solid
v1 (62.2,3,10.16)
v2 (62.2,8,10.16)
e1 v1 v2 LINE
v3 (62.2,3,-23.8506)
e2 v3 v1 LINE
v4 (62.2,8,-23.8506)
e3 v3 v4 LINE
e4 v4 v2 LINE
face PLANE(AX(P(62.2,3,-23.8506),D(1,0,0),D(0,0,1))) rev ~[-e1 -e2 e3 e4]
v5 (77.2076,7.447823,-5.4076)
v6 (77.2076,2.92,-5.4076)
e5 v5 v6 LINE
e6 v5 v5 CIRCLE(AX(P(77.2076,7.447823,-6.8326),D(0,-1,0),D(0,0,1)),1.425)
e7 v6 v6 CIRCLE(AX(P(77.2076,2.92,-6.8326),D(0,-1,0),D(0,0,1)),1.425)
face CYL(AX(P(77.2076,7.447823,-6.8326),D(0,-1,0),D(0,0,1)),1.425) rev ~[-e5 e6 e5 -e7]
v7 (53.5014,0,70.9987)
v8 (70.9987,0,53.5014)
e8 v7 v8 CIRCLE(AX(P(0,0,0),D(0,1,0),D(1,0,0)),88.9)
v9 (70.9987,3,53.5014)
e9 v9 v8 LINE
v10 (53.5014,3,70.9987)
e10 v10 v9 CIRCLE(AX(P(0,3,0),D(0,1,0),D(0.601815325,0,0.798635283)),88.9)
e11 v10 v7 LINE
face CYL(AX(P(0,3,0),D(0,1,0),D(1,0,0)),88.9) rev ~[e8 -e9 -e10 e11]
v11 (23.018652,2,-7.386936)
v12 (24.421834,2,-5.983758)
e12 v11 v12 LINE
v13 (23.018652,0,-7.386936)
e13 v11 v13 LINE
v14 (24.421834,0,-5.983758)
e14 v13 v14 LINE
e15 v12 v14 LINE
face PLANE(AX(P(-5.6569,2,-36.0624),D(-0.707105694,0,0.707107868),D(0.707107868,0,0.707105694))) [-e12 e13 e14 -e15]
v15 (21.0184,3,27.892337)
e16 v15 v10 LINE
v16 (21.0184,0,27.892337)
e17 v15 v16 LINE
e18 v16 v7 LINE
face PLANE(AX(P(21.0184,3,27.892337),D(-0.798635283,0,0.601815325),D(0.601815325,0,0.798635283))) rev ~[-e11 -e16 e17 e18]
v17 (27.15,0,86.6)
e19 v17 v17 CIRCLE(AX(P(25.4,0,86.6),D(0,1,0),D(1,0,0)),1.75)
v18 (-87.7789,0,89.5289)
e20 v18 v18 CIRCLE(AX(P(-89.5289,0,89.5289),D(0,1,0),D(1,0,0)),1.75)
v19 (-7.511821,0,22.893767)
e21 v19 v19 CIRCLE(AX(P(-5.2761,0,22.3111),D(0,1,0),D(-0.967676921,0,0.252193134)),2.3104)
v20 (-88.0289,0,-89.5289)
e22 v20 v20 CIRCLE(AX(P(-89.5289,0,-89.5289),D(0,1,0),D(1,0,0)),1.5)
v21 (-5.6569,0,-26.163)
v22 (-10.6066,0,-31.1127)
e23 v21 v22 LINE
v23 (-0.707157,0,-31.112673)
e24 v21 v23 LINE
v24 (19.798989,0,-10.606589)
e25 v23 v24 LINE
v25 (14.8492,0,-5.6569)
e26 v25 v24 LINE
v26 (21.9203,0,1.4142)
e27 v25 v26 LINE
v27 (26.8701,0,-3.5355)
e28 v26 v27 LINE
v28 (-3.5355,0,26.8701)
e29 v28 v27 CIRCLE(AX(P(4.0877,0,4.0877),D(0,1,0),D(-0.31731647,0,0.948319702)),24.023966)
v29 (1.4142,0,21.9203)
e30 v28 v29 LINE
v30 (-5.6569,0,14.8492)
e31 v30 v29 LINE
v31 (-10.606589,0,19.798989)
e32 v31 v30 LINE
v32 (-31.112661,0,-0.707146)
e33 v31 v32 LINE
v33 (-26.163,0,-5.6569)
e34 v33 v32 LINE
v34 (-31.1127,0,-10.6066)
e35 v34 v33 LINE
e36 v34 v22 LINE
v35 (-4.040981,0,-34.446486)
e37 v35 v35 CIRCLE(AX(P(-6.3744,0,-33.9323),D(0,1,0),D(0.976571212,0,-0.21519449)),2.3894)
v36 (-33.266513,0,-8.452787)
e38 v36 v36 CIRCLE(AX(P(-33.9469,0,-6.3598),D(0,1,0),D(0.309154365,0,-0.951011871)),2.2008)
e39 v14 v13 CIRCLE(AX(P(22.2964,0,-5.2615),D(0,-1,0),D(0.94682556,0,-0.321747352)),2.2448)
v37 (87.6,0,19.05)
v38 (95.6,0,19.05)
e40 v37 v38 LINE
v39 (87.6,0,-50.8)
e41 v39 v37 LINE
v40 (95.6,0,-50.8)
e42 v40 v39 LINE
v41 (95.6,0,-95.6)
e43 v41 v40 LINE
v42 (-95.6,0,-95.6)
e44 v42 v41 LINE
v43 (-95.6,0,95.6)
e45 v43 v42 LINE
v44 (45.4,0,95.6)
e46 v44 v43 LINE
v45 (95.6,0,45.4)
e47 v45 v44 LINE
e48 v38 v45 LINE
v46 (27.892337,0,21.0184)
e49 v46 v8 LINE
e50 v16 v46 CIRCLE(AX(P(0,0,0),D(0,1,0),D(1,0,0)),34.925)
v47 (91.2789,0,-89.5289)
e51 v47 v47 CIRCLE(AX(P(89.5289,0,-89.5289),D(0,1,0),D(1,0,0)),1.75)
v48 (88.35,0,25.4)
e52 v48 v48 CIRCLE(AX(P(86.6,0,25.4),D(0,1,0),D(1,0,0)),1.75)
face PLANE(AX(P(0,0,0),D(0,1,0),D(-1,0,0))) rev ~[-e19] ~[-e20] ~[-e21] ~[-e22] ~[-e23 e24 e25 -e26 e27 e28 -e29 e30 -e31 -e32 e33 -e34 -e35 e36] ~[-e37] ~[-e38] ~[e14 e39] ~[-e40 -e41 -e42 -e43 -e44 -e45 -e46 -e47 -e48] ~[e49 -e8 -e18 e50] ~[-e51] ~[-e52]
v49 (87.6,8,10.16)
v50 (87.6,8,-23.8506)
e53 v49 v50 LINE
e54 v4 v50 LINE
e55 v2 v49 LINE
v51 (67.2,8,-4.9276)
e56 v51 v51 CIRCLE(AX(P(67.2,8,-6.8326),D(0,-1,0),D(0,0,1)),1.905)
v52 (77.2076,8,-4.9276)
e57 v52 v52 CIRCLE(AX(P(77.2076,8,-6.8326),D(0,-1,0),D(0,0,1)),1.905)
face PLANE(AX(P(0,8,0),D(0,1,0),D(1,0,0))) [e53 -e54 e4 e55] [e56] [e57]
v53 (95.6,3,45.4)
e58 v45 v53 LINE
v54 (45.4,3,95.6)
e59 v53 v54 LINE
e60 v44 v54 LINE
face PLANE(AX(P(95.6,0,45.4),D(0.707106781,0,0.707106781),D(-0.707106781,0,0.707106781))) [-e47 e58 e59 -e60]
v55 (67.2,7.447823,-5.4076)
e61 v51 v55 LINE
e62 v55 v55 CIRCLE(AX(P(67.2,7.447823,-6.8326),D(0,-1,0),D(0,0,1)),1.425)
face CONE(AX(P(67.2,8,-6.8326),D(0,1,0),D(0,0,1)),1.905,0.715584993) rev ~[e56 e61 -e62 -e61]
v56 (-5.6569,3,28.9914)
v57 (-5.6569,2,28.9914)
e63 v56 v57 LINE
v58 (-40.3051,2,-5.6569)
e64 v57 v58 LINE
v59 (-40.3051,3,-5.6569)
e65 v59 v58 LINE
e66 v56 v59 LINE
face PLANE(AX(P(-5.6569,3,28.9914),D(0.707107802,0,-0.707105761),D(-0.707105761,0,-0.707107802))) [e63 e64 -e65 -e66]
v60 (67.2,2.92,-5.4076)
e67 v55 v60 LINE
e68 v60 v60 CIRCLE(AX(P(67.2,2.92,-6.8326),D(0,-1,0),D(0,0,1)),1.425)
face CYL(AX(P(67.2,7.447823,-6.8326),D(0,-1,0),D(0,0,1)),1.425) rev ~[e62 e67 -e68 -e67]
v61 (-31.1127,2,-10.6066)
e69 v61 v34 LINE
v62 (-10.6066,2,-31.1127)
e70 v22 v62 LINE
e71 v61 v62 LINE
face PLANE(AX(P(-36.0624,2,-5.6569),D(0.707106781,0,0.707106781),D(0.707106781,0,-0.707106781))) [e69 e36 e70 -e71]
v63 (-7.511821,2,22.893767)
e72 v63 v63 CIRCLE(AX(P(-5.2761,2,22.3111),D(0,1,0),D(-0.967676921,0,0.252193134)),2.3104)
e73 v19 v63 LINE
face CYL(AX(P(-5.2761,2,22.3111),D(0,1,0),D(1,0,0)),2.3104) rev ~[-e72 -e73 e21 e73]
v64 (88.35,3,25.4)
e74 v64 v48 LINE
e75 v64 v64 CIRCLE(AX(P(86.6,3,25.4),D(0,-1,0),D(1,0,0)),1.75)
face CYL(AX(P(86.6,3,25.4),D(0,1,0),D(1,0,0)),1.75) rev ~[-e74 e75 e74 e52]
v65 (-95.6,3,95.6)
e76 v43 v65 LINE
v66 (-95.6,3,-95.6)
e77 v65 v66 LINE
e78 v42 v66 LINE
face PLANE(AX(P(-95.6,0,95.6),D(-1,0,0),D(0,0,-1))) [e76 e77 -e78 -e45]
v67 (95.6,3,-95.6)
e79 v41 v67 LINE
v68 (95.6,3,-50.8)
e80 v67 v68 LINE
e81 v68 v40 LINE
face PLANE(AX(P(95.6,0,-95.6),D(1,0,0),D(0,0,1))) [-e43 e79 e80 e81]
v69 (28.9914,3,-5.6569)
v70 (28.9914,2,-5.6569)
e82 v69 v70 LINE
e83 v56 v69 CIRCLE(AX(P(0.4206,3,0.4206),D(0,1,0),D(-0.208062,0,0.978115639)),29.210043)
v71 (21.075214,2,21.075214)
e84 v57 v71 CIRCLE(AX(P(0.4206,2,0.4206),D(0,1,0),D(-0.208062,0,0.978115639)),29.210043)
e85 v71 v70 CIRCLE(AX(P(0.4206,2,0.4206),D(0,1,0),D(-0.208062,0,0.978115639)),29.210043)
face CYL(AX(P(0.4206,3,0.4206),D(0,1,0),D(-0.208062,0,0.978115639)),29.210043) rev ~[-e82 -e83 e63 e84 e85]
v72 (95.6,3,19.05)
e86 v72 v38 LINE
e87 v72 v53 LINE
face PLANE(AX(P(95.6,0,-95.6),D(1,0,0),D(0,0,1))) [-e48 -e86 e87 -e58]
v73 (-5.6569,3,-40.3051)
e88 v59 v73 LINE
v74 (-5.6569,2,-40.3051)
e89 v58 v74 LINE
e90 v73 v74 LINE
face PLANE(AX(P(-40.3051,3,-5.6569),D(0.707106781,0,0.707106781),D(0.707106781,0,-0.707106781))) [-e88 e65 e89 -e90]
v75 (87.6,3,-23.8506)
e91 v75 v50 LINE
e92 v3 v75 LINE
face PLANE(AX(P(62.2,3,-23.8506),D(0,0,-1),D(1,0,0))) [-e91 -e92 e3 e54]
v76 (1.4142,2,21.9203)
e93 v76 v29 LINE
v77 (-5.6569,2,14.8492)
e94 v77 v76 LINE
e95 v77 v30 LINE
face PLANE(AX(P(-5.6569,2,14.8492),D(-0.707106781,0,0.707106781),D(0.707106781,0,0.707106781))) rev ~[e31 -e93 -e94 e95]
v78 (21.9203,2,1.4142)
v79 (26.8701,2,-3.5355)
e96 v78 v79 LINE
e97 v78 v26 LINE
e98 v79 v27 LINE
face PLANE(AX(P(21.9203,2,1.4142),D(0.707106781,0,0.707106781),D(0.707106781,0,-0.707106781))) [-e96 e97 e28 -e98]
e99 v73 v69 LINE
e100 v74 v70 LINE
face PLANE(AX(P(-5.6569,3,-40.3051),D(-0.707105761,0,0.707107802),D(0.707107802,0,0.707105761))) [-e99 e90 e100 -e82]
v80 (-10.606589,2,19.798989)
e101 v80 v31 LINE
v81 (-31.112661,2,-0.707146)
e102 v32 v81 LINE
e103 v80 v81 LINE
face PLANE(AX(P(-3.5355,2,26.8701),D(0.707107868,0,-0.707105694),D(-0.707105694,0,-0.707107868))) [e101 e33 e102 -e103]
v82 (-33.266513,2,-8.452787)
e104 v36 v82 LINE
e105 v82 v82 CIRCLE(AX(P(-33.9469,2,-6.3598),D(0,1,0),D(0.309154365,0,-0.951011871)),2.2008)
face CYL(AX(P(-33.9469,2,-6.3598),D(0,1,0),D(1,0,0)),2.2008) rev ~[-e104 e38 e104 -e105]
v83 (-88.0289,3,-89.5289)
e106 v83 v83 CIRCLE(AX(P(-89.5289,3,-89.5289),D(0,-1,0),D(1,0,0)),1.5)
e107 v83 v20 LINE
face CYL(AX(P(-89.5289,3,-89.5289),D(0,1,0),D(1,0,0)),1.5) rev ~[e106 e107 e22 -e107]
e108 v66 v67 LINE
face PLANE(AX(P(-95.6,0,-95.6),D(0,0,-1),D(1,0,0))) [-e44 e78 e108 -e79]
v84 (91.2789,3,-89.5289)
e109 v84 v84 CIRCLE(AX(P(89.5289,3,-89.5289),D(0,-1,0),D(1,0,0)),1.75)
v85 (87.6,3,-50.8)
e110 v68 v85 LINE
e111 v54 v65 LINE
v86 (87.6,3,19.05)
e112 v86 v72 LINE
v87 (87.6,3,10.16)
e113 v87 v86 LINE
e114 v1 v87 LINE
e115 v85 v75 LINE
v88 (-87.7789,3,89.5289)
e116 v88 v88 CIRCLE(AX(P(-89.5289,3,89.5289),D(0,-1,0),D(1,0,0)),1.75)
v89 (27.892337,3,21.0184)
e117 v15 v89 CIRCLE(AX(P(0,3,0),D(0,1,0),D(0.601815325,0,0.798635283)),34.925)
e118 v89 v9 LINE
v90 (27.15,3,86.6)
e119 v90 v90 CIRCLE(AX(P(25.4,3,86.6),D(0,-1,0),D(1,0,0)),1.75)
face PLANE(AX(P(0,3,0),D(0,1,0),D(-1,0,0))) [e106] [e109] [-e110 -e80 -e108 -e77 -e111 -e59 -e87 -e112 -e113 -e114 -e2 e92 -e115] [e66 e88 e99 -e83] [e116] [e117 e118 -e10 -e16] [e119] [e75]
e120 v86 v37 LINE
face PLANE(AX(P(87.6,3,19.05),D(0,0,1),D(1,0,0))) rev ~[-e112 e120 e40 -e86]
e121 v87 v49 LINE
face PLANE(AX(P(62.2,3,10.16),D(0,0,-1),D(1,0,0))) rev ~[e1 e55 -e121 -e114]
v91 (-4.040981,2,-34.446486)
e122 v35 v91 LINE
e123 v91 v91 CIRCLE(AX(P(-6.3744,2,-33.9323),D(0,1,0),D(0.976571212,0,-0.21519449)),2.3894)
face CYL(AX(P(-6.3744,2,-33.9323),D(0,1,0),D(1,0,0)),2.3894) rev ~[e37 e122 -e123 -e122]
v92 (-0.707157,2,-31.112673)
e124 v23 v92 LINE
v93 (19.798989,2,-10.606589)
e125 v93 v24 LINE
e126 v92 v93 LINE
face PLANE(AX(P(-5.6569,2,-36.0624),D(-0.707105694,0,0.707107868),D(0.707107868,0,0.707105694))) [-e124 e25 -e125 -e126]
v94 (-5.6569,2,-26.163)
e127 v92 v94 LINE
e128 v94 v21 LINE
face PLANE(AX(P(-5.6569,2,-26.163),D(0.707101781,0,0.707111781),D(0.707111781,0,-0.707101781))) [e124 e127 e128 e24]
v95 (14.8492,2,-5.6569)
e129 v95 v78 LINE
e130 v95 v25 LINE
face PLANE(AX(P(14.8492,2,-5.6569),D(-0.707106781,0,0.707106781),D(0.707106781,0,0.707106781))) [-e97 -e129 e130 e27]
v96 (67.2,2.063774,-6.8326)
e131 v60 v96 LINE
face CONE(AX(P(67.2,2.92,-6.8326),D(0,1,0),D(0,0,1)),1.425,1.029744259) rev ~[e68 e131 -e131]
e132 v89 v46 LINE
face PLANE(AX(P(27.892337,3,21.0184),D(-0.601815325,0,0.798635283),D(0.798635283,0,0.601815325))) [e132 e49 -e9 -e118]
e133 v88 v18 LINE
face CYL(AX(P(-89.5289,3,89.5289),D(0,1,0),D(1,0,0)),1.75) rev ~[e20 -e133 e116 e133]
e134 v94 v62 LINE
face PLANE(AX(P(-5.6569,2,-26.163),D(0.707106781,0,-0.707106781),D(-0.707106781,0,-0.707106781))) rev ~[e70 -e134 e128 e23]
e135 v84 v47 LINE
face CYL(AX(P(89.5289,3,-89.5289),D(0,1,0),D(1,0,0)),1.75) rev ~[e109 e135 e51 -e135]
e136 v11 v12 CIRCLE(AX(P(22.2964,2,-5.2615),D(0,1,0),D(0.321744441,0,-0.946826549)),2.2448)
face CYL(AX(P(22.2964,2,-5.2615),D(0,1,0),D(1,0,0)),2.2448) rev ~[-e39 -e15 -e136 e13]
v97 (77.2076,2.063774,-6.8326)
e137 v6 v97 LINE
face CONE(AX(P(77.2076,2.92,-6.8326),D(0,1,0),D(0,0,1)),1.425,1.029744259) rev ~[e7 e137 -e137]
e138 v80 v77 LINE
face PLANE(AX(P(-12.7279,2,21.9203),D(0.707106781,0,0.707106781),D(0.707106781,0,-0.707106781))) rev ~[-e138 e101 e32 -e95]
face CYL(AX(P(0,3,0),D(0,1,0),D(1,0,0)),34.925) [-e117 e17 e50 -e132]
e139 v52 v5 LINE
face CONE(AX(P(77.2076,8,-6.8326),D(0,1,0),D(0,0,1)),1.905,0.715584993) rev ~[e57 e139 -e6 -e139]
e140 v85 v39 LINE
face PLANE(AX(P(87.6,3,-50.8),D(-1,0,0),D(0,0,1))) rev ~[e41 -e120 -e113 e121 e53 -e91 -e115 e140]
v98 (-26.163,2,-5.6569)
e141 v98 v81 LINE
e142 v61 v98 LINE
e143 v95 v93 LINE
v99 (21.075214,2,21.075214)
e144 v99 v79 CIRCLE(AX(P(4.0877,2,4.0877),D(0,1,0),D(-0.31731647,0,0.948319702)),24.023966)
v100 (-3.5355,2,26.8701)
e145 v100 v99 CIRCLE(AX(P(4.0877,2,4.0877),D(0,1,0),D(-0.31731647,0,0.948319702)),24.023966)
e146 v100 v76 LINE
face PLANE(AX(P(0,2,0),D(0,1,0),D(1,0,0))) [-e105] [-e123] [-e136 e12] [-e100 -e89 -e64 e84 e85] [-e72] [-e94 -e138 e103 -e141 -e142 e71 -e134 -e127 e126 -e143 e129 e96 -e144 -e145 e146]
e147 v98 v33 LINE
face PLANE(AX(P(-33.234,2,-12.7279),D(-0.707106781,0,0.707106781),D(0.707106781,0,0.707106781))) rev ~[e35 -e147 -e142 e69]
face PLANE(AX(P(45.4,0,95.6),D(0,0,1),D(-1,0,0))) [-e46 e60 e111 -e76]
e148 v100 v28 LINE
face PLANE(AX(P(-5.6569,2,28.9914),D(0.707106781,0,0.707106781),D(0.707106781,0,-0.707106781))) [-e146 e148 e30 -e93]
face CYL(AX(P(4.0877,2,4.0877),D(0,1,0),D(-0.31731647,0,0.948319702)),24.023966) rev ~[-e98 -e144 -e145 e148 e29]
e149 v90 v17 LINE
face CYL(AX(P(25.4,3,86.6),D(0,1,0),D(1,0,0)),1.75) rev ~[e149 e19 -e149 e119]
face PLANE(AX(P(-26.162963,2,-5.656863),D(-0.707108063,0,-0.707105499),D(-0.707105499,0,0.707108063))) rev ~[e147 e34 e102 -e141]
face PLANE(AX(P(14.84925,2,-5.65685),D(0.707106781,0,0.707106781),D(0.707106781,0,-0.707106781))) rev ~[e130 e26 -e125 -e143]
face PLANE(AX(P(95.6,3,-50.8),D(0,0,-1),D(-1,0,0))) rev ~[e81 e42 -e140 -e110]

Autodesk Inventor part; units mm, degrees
ref_plane "YZ Plane" through (0, 0, 0) normal (1, 0, 0) x (0, 1, 0)
ref_plane "XZ Plane" through (0, 0, 0) normal (0, 1, 0) x (-1, 0, 0)
sketch "Sketch1" plane through (0, 0, 0) normal (0, 1, 0) x (-1, 0, 0)
  line L0 (101.6, -101.6) -> (-101.6, -101.6)
  line L1 (-101.6, -101.6) -> (-101.6, 101.6)
  line L2 (-101.6, 101.6) -> (101.6, 101.6)
  line L3 (101.6, 101.6) -> (101.6, -101.6)
  line L4 (96.6, -96.6) -> (-96.6, -96.6)
  line L5 (-96.6, -96.6) -> (-96.6, 96.6)
  line L6 (-96.6, 96.6) -> (96.6, 96.6)
  line L7 (96.6, 96.6) -> (96.6, -96.6)
  line L8 (101.6, 101.6) -> (-40.4, 101.6)
  circle A0 centre (0, 0) radius 88.9
  line L9 (-40.4, 101.6) -> (-101.6, 40.4)
  line L10 (-45.4, 101.6) -> (-101.6, 45.4)
  line L11 (96.6, 96.6) -> (96.6, 101.6)
  line L12 (-45.4, 101.6) -> (-35.4, 101.6)
  line L13 (-35.4, 101.6) -> (-35.4, 96.6)
  line L14 (-35.4, 96.6) -> (-45.4, 96.6)
  line L15 (-45.4, 96.6) -> (-45.4, 101.6)
  line L16 (-101.6, 39.4) -> (-39.4, 101.6)
  line L17 (95.6, -95.6) -> (-95.6, -95.6)
  line L18 (-95.6, -95.6) -> (-95.6, 95.6)
  line L19 (-95.6, 95.6) -> (95.6, 95.6)
  line L20 (95.6, 95.6) -> (95.6, -95.6)
  point P0 (96.6, 51.2168)
  point P1 (101.6, 40.4)
  point P2 (101.6, -40.4)
  point P3 (96.6, -51.2168)
  point P4 (-96.6, 45.4)
  point P5 (-45.4, 96.6)
  point P6 (-45.4, 95.6)
  point P7 (-95.6, 45.4)
  dimension "d0" = 203.2
  dimension "d1" = 203.2
  dimension "d2" = 101.6
  dimension "d3" = 101.6
  dimension "d4" = 5
  dimension "d5" = 5
  dimension "d6" = 5
  dimension "d7" = 5
  dimension "d8" = 142
  dimension "d9" = 61.2
  dimension "d10" = 177.8
  dimension "d11" = 5
  dimension "d12" = 5
  dimension "d13" = 10
  dimension "d14" = 1
  dimension "d15" = 1
  dimension "d16" = 1
  dimension "d17" = 1
  dimension "d18" = 1
extrude "Extrusion1" add sketch "Sketch1" along normal blind 3 contours L16 L19 L20 L17 L18 | A0
sketch "Sketch2" plane through (0, 3, 0) normal (0, 1, 0) x (1, 0, 0)
  circle A0 centre (0, 0) radius 34.925
  circle A1 centre (0, 0) radius 88.9
  line L0 (0, 0) -> (53.5014, -70.9987)
  line L1 (0, 0) -> (70.9987, -53.5014)
  line L2 (45.4, -95.6) -> (95.6, -45.4) projected
  line L3 (70.5, -70.5) -> (0, 0)
  point P0 (21.0184, -27.8923)
  point P1 (27.8923, -21.0184)
  dimension "d21" = 69.85
  dimension "d22" = 177.8
  dimension "d23" = 8
  dimension "d24" = 8
extrude "Extrusion2" cut sketch "Sketch2" against normal blind 5 contours A0 L3 A1 L0 | L1 A1 L3 A0
sketch "Sketch3" plane through (0, 3, 0) normal (0, 1, 0) x (1, 0, 0)
  circle A0 centre (0, 0) radius 2.5
  line L0 (11.3314, 2.139) -> (-2.139, -11.3314)
  line L1 (0, 0) -> (-5.6569, 5.6569)
  line L2 (-5.6569, -14.8492) -> (-26.163, 5.6569)
  line L3 (-5.6569, 26.163) -> (14.8492, 5.6569)
  circle A1 centre (-5.6569, 5.6569) radius 14
  line L4 (-26.163, 5.6569) -> (-5.6569, 26.163)
  line L5 (14.8492, 5.6569) -> (-5.6569, -14.8492)
  line L6 (-40.3051, 5.6569) -> (-5.6569, 40.3051)
  line L7 (-5.6569, 40.3051) -> (28.9914, 5.6569)
  line L8 (28.9914, 5.6569) -> (-5.6569, -28.9914)
  line L9 (-5.6569, -28.9914) -> (-40.3051, 5.6569)
  line L10 (-22.6451, 9.1747) -> (-9.1747, 22.6451)
  line L11 (-9.1747, 22.6451) -> (-12.7668, 26.2372)
  line L12 (-12.7668, 26.2372) -> (-26.2372, 12.7668)
  line L13 (-26.2372, 12.7668) -> (-22.6451, 9.1747)
  line L14 (-36.0624, 5.6569) -> (-5.6569, 36.0624)
  line L15 (-5.6569, 36.0624) -> (26.8701, 3.5355)
  line L16 (26.8701, 3.5355) -> (-3.5355, -26.8701)
  line L17 (-3.5355, -26.8701) -> (-36.0624, 5.6569)
  arc A2 (-5.6569, -28.9914) -> (28.9914, 5.6569) centre (0.4206, -0.4206) ccw
  dimension "d27" = 8
  dimension "d28" = 28
  dimension "d29" = 29
  dimension "d30" = 29
  dimension "d31" = 14.5
  dimension "d32" = 10
  dimension "d33" = 10
  dimension "d34" = 10
  dimension "d35" = 10
  dimension "d36" = 5.08
  dimension "d37" = 9.525
  dimension "d38" = 9.525
  dimension "d39" = 3
  dimension "d40" = 3
  dimension "d41" = 0
  dimension "d42" = 3
  dimension "d51" = 29.21
extrude "Extrusion3" cut sketch "Sketch3" against normal blind 1 contours A0 | L0 L5 L2 L4 L3 | L4 L13 L12 L11 | A1 | L6 L7 L8 L15 L14 L17 L9 | L8 A2 | L17 L14 L15 L8
sketch "Sketch4" plane through (0, 2, 0) normal (0, 1, 0) x (1, 0, 0)
  line L0 (-36.0624, 5.6569) -> (-5.6569, 36.0624)
  line L1 (-5.6569, 36.0624) -> (26.8701, 3.5355)
  line L2 (26.8701, 3.5355) -> (-3.5355, -26.8701)
  line L3 (-3.5355, -26.8701) -> (-36.0624, 5.6569)
  line L4 (-5.6569, 40.3051) -> (28.9914, 5.6569) projected
  line L5 (-40.3051, 5.6569) -> (-5.6569, 40.3051) projected
  line L6 (-5.6569, -28.9914) -> (-40.3051, 5.6569) projected
  line L7 (28.9914, 5.6569) -> (-5.6569, -28.9914) projected
  arc A0 (-3.5355, -26.8701) -> (26.8701, 3.5355) centre (4.0877, -4.0877) ccw
  point P0 (0, 0)
  dimension "d45" = 3
  dimension "d46" = 3
  dimension "d47" = 3
  dimension "d48" = 0
extrude "Extrusion4" cut sketch "Sketch4" against normal blind 5 contours L0 L1 L2 L3 | L2 A0
sketch "Sketch6" plane through (0, 3, 0) normal (0, 1, 0) x (1, 0, 0)
  line L0 (95.6, 95.6) -> (-95.6, 95.6) projected
  line L1 (95.6, 95.6) -> (87.6, 95.6)
  line L2 (87.6, 95.6) -> (87.6, -46.4)
  line L3 (87.6, -46.4) -> (95.6, -46.4)
  line L4 (95.6, -46.4) -> (95.6, 95.6)
  line L5 (95.6, -45.4) -> (95.6, 95.6) projected
  line L6 (87.6, -19.05) -> (95.6, -19.05)
  line L7 (95.6, -19.05) -> (95.6, 50.8)
  line L8 (95.6, 50.8) -> (87.6, 50.8)
  line L9 (87.6, 50.8) -> (87.6, -19.05)
  line L10 (0, 0) -> (95.6, 0)
  point P0 (95.6, -19.05)
  dimension "d58" = 8
  dimension "d59" = 142
  dimension "d62" = 50.8
  dimension "d63" = 19.05
extrude "Extrusion6" cut sketch "Sketch6" against normal blind 25.4 contours L4 L10 L2 L8 | L4 L6 L2 L10
sketch "Sketch7" plane through (0, 3, 0) normal (0, 1, 0) x (1, 0, 0)
  line L0 (-95.6, 95.6) -> (-95.6, -95.6) projected
  line L1 (-95.6, -95.6) -> (45.4, -95.6) projected
  line L2 (95.6, 50.8) -> (87.6, 50.8) projected
  line L3 (87.6, 50.8) -> (62.2, 50.8)
  line L4 (87.6, -19.05) -> (87.6, 50.8)
  line L5 (87.6, -19.05) -> (87.6, 50.8) projected
  line L6 (87.6, 50.8) -> (95.6, 50.8) projected
  line L7 (87.6, 50.8) -> (62.2, 50.8)
  line L8 (62.2, 50.8) -> (62.2, -10.16)
  line L9 (62.2, -10.16) -> (87.6, -10.16)
  line L10 (87.6, -10.16) -> (87.6, 50.8)
  line L11 (62.2, 23.8506) -> (87.6, 23.8506)
  point P0 (0, 0)
  dimension "d72" = 60.96
  dimension "d90" = 34.0106
extrude "Extrusion7" add sketch "Sketch7" along normal blind 5 contours L4 L9 L8 L11
sketch "Sketch8" plane through (0, 8, 0) normal (0, 1, 0) x (1, 0, 0)
  line L0 (62.2, -10.16) -> (87.6, -10.16) projected
  line L1 (62.2, -10.16) -> (87.6, -10.16)
  line L2 (87.6, -10.16) -> (87.6, 6.8326)
  line L3 (87.6, 50.8) -> (87.6, -19.05) projected
  line L4 (87.6, 6.8326) -> (62.2, 6.8326)
  circle A0 centre (77.2076, 6.8326) radius 1.5
  circle A1 centre (67.2, 6.8326) radius 1.5
  line L5 (62.2, 23.8506) -> (62.2, -10.16) projected
  point P0 (0, 0)
  dimension "d78" = 16.9926
  dimension "d79" = 3
  dimension "d80" = 3
  dimension "d139" = 5
  dimension "d140" = 10.0076
hole "Hole1" at (77.2076, 8, -6.8326) at (67.2, 8, -6.8326) direction (0, -1, 0) diameter 2.85 depth 5.08 tip angle 118 countersink diameter 3.81 countersink angle 82 thread size "M3.5x0.6" class "6H" standard "ANSI Metric M Profile"
sketch "Sketch9" plane through (0, 2, 0) normal (0, 1, 0) x (1, 0, 0)
  point P0 (0, 0)
sketch "Sketch10" plane through (0, 2, 0) normal (0, 1, 0) x (1, 0, 0)
  circle A0 centre (6.7129, 18.0166) radius 2
  circle A1 centre (-18.0312, -6.7275) radius 2
  circle A2 centre (-18.0312, -6.7275) radius 2
  circle A3 centre (-5.6569, 5.6469) radius 14
  circle A4 centre (0, -0.01) radius 2.5
  circle A5 centre (22.2964, 5.2615) radius 2.2448
  circle A6 centre (-5.2761, -22.3111) radius 2.3104
  circle A7 centre (-33.9469, 6.3598) radius 2.2008
  circle A8 centre (-6.3744, 33.9323) radius 2.3894
  line L0 (-5.6569, 40.3051) -> (28.9914, 5.6569) projected
  line L1 (-5.6569, 40.3051) -> (1.4142, 33.234)
  line L2 (-5.6569, 26.163) -> (1.4142, 33.234)
  line L3 (-5.6569, 26.163) -> (-12.7279, 33.234)
  line L4 (-40.3051, 5.6569) -> (-5.6569, 40.3051) projected
  line L5 (-5.6569, 40.3051) -> (-40.3051, 5.6569)
  line L6 (-5.6569, 26.163) -> (-33.234, -1.4142)
  line L7 (-5.6569, -28.9914) -> (-40.3051, 5.6569) projected
  line L8 (-33.234, 12.7279) -> (-26.163, 5.6569)
  arc A9 (-5.6569, -28.9914) -> (21.0752, -21.0752) centre (0.4206, -0.4206) ccw projected
  line L9 (-5.6569, -28.9914) -> (28.9914, 5.6569)
  line L10 (-5.6569, 36.0624) -> (26.8701, 3.5355) projected
  line L11 (-12.7279, -21.9203) -> (21.9203, 12.7279)
  line L12 (-5.6569, -14.8492) -> (1.4142, -21.9203)
  line L13 (14.8492, 5.6569) -> (21.9203, -1.4142)
  point P0 (0, 0)
  point P1 (0.0071, -0.017)
  point P2 (24.4219, 5.9837)
  point P3 (23.0187, 7.3869)
  point P4 (19.799, 10.6066)
  dimension "d91" = 34.9934
  dimension "d92" = 28
  dimension "d93" = 8
  dimension "d94" = 10
  dimension "d95" = 10
  dimension "d96" = 10
  dimension "d97" = 10
  dimension "d98" = 10
extrude "Extrusion8" add sketch "Sketch10" against normal up to surface (2 mm away) contours A5 L10 L9 L13 L11 | L2 L3 L4 L0 | L9 L7 L11 L12 | L6 L7 L4 L8
sketch "Sketch11" plane through (0, 3, 0) normal (0, 1, 0) x (1, 0, 0)
  circle A0 centre (6.7129, 18.0166) radius 2
  circle A1 centre (-18.0312, -6.7275) radius 2
  circle A2 centre (-18.0312, -6.7275) radius 2
  circle A3 centre (-5.6569, 5.6469) radius 14
  circle A4 centre (0, -0.01) radius 2.5
  circle A5 centre (22.2964, 5.2615) radius 2.2448
  circle A6 centre (-5.2761, -22.3111) radius 2.3104
  circle A7 centre (-33.9469, 6.3598) radius 2.2008
  circle A8 centre (-6.3744, 33.9323) radius 2.3894
  line L0 (-5.6569, 40.3051) -> (28.9914, 5.6569)
  line L1 (-5.6569, 40.3051) -> (1.4142, 33.234)
  line L2 (-5.6569, 26.163) -> (1.4142, 33.234)
  line L3 (-5.6569, 26.163) -> (-12.7279, 33.234)
  line L4 (-40.3051, 5.6569) -> (-5.6569, 40.3051)
  line L5 (-5.6569, 40.3051) -> (-40.3051, 5.6569)
  line L6 (-5.6569, 26.163) -> (-33.234, -1.4142)
  line L7 (-5.6569, -28.9914) -> (-40.3051, 5.6569)
  line L8 (-33.234, 12.7279) -> (-26.163, 5.6569)
  arc A9 (-5.6569, -28.9914) -> (21.0752, -21.0752) centre (0.4206, -0.4206) ccw
  line L9 (-5.6569, -28.9914) -> (28.9914, 5.6569)
  line L10 (-5.6569, 36.0624) -> (26.8701, 3.5355)
  line L11 (-12.7279, -21.9203) -> (21.9203, 12.7279)
  line L12 (-5.6569, -14.8492) -> (1.4142, -21.9203)
  line L13 (14.8492, 5.6569) -> (21.9203, -1.4142)
  point P0 (0, 0)
  point P1 (0, 0)
  point P2 (0.0071, -0.017)
  point P3 (24.4219, 5.9837)
  point P4 (23.0187, 7.3869)
  point P5 (19.799, 10.6066)
  point P6 (24.4219, 5.9837)
  point P7 (23.0187, 7.3869)
  dimension "d101" = 34.9934
  dimension "d102" = 28
  dimension "d103" = 8
  dimension "d104" = 10
  dimension "d105" = 10
  dimension "d106" = 10
  dimension "d107" = 10
  dimension "d108" = 10
extrude "Extrusion9" cut sketch "Sketch11" against normal blind 10 contours A5 L10 | A6 | A7 | A8 picked at (21.4653, 4.9881)
sketch "Sketch12" plane through (0, 3, 0) normal (0, 1, 0) x (1, 0, 0)
  line L0 (95.6, 50.8) -> (95.6, 95.6) projected
  line L1 (-95.6, -95.6) -> (45.4, -95.6) projected
  line L2 (95.6, 95.6) -> (-95.6, -95.6)
  line L3 (95.6, 95.6) -> (-95.6, 95.6) projected
  line L4 (0, 95.6) -> (0, -95.6)
  line L5 (-95.6, -95.6) -> (45.4, -95.6) projected
  point P0 (0, 0)
ref_plane "Work Plane2" through (0, 3, -95.6) normal (-1, 0, 0) x (0, 0, 1)
sketch "Sketch15" plane through (0, 3, 0) normal (0, 1, 0) x (1, 0, 0)
  line L0 (-96.6, 96.6) -> (-96.6, -96.6)
  line L1 (96.6, 96.6) -> (-96.6, 96.6)
  line L2 (-96.6, 96.6) -> (96.6, 96.6)
  line L3 (96.6, -45.4) -> (45.4, -96.6)
  line L4 (96.6, 96.6) -> (96.6, -45.4)
  line L5 (96.6, -45.4) -> (45.4, -96.6)
  line L6 (45.4, -96.6) -> (-96.6, -96.6)
  line L7 (-96.6, -96.6) -> (-96.6, 96.6)
  line L8 (-96.6, 96.6) -> (-89.5289, 89.5289)
  circle A0 centre (-89.5289, 89.5289) radius 5
  circle A1 centre (-89.5289, 89.5289) radius 1.5
  line L9 (-89.5289, 84.5289) -> (-96.6, 84.5289)
  line L10 (-89.5289, 89.5289) -> (-89.5289, 84.5289)
  line L11 (-89.5289, 89.5289) -> (-84.5289, 89.5289)
  line L12 (-84.5289, 96.6) -> (-84.5289, 89.5289)
  line L13 (-96.6, -96.6) -> (-89.5289, -89.5289)
  line L14 (-96.6, -96.6) -> (-86.6, -96.6) construction
  circle A2 centre (-89.5289, -89.5289) radius 5
  circle A3 centre (-89.5289, -89.5289) radius 1.75
  line L15 (-89.5289, -89.5289) -> (-84.5289, -89.5289)
  line L16 (-84.5289, -96.6) -> (-84.5289, -89.5289)
  line L17 (-89.5289, -89.5289) -> (-89.5289, -84.5289)
  line L18 (-96.6, -84.5289) -> (-89.5289, -84.5289)
  line L19 (96.6, 96.6) -> (89.5289, 89.5289)
  circle A4 centre (89.5289, 89.5289) radius 5
  circle A5 centre (89.5289, 89.5289) radius 1.75
  line L20 (89.5289, 89.5289) -> (84.5289, 89.5289)
  line L21 (84.5289, 96.6) -> (84.5289, 89.5289)
  line L22 (89.5289, 89.5289) -> (89.5289, 84.5289)
  line L23 (96.6, 84.5289) -> (89.5289, 84.5289)
  line L24 (96.6, -43.114) -> (96.6, 96.6)
  line L25 (-96.6, -96.6) -> (43.1178, -96.6)
  line L26 (28.9914, 5.6569) -> (-5.6569, -28.9914)
  line L27 (25.4, -25.4) -> (101.6, -25.4)
  line L28 (101.6, -88.9) -> (101.6, 101.6)
  line L29 (25.4, -25.4) -> (25.4, -101.6)
  line L30 (43.1178, -101.6) -> (-101.6, -101.6)
  line L31 (96.6, -25.4) -> (86.6, -25.4)
  circle A6 centre (86.6, -25.4) radius 5
  circle A7 centre (86.6, -25.4) radius 1.75
  line L32 (25.4, -96.6) -> (25.4, -86.6)
  circle A8 centre (25.4, -86.6) radius 5
  circle A9 centre (25.4, -86.6) radius 1.75
  point P0 (0, 0)
  point P1 (0, 0)
  dimension "d117" = 10
  dimension "d118" = 3
  dimension "d119" = 10
  dimension "d120" = 45
  dimension "d121" = 10
  dimension "d122" = 3.5
  dimension "d123" = 10
  dimension "d124" = 10
  dimension "d125" = 3.5
  dimension "d126" = 76.2
  dimension "d127" = 76.2
  dimension "d128" = 10
  dimension "d129" = 10
  dimension "d130" = 3.5
  dimension "d131" = 10
  dimension "d132" = 10
  dimension "d133" = 3.5
extrude "Extrusion12" cut sketch "Sketch15" against normal blind 25.4 contours A1 L11 L8 | L8 L10 A1 | L10 L11 A1 | L17 L13 A3 | A3 L15 L17 | L20 L22 A5 | A5 L19 L20 | L13 L15 A3 | A5 L22 L19 | A9 L29 | L29 A9 | A7 L27 | L27 A7
equation "\"d1\" = d0"
equation "\"d2\" = 0.5 * d0"
equation "\"d3\" = 0.5 * d0"
properties part number "Drop_Plate"
